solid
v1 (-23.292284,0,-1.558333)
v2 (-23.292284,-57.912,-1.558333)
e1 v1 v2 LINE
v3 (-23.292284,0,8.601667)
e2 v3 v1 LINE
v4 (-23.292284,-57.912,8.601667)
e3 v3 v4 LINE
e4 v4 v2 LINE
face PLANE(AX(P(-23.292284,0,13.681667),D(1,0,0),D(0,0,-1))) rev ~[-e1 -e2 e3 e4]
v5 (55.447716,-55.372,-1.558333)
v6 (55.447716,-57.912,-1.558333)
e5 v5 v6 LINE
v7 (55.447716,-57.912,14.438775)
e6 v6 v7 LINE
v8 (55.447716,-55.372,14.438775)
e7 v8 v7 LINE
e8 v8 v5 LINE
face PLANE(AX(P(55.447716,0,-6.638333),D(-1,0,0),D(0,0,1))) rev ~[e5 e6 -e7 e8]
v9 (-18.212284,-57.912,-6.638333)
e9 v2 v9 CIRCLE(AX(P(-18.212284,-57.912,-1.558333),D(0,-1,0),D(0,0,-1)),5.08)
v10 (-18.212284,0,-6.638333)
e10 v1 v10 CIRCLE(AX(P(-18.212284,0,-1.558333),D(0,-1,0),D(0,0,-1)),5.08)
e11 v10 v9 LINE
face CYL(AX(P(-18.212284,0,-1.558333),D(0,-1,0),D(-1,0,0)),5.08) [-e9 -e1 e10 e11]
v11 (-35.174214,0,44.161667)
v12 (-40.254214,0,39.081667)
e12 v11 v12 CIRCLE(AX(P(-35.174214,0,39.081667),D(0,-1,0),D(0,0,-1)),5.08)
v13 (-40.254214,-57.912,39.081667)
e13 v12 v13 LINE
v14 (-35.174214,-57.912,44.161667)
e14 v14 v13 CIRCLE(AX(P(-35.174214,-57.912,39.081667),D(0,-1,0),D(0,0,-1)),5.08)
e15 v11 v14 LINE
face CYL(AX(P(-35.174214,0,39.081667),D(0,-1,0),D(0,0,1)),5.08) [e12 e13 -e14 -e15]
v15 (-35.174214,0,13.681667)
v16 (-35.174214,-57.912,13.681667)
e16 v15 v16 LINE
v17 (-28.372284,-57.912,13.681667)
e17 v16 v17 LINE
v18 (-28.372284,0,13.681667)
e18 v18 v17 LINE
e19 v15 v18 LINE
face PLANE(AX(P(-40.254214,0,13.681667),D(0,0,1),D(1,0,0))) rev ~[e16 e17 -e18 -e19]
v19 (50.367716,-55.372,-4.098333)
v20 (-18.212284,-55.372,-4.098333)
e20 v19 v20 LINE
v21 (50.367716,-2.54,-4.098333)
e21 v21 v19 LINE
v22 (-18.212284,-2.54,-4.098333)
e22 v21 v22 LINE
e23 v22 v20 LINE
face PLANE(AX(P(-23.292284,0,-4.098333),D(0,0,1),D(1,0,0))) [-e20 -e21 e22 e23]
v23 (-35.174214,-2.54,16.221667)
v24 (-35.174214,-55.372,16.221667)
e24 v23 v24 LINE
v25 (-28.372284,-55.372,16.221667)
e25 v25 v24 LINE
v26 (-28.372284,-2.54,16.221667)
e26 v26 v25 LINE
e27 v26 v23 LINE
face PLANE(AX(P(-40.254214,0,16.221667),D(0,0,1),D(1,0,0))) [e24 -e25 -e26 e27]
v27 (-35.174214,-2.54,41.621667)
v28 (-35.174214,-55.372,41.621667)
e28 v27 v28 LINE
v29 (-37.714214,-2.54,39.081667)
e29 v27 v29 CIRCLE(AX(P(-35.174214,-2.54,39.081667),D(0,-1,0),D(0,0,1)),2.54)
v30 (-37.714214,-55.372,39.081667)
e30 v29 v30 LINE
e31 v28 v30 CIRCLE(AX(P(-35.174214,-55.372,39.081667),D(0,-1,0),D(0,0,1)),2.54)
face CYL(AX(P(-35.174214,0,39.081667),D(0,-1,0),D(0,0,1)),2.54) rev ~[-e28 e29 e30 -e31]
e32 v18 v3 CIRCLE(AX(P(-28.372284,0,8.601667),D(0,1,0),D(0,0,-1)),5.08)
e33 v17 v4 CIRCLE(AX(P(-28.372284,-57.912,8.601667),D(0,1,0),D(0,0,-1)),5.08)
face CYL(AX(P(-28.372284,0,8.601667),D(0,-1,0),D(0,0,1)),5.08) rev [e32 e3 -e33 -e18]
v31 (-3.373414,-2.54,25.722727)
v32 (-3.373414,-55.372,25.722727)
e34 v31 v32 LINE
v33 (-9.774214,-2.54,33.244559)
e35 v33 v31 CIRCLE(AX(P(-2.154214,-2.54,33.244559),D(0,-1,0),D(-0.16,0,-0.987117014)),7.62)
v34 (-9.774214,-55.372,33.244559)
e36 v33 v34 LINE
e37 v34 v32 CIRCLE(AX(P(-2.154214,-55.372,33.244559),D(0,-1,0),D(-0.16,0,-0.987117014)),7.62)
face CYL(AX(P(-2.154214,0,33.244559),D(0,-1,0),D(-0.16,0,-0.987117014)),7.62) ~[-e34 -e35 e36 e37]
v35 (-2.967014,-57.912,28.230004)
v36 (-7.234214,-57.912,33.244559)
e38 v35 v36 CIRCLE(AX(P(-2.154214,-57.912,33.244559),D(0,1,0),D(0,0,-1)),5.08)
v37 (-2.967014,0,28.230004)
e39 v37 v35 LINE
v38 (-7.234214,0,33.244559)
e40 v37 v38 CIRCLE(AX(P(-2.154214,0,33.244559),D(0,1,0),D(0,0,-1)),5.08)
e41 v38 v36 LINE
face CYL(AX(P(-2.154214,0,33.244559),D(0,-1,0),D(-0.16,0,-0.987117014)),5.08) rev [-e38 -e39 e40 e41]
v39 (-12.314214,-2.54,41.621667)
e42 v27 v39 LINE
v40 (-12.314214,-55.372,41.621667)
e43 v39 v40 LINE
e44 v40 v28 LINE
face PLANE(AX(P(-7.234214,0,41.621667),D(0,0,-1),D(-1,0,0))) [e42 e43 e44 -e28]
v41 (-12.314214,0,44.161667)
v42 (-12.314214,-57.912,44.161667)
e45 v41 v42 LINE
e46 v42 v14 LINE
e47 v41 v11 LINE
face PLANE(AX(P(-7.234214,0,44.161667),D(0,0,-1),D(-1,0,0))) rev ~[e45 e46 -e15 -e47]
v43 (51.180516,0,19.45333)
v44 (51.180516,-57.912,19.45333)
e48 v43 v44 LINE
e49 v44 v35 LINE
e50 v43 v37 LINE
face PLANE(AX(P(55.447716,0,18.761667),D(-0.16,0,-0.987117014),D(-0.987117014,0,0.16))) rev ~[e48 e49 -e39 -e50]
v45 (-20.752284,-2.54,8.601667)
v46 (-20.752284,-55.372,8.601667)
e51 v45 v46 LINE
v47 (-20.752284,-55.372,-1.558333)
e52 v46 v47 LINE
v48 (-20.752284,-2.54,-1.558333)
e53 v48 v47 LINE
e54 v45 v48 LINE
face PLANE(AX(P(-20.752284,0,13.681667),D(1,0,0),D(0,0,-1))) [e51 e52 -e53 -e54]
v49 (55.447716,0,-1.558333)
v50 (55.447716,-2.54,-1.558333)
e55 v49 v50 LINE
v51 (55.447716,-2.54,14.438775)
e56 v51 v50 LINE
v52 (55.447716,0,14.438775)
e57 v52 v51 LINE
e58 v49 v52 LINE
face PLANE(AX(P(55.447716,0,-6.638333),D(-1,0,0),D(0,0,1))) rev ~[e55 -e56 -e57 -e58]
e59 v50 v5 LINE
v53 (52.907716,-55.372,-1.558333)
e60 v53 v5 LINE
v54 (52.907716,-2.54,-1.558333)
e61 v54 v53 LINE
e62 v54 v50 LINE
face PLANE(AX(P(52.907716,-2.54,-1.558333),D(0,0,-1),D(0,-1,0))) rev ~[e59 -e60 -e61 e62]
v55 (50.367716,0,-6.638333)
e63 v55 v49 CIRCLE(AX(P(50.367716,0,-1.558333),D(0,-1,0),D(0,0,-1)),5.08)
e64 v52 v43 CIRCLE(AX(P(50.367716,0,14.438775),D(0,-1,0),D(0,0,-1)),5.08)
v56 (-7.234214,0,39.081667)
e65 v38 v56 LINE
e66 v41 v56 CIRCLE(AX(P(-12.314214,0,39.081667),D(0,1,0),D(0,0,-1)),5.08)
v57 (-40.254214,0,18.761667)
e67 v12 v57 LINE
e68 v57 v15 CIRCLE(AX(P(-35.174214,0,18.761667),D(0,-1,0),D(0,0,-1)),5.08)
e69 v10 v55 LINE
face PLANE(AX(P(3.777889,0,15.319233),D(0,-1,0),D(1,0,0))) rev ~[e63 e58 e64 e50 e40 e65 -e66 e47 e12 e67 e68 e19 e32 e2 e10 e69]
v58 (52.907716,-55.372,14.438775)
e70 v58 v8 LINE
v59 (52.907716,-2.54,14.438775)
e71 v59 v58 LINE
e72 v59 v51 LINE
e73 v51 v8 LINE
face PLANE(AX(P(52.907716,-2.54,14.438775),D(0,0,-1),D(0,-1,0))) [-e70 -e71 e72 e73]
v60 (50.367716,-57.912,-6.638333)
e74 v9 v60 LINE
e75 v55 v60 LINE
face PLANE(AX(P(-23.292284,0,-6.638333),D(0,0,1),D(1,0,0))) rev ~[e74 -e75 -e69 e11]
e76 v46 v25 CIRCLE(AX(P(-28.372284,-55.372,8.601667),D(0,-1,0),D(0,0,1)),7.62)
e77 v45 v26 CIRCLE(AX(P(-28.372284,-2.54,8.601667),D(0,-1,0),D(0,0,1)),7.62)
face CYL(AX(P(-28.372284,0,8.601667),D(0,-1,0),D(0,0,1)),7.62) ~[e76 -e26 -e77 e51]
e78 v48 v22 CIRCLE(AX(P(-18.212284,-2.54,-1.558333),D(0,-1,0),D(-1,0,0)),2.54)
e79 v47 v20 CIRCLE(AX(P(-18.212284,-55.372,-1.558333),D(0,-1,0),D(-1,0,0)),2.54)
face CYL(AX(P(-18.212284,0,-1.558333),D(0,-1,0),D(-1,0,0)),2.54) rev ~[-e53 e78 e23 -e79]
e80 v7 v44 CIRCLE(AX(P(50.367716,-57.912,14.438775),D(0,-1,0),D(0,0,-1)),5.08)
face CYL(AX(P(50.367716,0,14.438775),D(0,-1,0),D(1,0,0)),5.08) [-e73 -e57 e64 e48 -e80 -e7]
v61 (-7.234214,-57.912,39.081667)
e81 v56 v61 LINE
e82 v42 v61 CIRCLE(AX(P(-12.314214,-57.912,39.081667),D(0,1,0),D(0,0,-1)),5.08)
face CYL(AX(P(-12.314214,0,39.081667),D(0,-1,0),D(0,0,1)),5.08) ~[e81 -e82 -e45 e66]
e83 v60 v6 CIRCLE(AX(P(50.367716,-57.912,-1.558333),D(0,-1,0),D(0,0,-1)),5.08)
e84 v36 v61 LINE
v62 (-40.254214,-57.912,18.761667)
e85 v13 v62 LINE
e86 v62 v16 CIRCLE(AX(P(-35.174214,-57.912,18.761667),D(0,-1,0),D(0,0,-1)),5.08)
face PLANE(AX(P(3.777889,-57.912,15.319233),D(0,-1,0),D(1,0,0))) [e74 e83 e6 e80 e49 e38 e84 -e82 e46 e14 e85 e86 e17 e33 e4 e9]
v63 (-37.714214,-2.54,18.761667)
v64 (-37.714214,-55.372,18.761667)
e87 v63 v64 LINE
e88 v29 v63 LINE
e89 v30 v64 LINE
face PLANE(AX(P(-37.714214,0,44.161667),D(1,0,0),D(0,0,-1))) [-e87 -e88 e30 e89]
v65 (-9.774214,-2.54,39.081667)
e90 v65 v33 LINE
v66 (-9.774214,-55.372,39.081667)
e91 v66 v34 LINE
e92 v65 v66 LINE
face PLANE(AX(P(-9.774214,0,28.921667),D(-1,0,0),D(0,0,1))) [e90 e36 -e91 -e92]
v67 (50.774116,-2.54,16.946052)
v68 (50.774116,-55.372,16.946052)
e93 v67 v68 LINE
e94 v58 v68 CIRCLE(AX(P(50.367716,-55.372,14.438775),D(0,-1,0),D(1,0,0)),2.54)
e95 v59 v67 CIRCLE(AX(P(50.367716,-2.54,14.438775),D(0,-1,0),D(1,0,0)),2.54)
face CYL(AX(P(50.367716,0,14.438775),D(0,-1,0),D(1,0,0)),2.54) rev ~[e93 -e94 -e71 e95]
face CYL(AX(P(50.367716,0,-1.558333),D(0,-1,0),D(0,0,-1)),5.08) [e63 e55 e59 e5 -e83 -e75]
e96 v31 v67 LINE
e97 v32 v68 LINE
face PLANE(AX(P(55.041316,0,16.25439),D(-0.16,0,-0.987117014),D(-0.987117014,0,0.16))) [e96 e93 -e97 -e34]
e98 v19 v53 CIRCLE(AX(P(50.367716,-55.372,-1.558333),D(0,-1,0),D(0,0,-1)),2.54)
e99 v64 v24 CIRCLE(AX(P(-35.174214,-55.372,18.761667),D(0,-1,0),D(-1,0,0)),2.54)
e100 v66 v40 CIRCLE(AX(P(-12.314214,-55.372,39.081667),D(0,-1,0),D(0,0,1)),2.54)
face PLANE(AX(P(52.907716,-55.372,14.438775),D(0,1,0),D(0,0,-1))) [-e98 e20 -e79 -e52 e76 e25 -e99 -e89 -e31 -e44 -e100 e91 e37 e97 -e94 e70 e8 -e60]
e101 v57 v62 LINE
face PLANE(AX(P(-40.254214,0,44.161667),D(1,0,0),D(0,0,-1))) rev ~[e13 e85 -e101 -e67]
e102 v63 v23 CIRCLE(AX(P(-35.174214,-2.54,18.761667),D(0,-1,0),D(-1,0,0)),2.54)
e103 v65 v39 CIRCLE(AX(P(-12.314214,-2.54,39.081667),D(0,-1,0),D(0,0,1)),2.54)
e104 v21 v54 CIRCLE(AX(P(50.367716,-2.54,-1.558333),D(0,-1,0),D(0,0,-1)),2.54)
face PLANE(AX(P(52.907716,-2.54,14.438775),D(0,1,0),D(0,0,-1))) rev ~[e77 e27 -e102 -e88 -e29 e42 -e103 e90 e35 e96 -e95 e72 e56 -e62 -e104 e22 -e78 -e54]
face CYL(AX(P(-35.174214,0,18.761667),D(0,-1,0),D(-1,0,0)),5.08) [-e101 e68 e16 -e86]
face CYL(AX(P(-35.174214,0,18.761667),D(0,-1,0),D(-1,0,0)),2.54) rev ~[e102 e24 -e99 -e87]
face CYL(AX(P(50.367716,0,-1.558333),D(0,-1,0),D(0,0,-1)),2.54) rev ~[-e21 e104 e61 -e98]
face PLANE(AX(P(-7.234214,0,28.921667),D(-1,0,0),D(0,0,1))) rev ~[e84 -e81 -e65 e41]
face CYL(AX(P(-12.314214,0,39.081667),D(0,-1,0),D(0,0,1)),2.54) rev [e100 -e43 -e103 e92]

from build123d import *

# Parameters (mm, degrees)
F1_DEPTH = 57.912
F2_R     = 5.08
F3_T     = -2.54


# Not quite as in the source:
# - a shell that OpenCascade refuses in one call is made with other operations: the cavity is built on its own and cut out


with BuildPart() as f1:
    # F0 (on Front) → F1 (new body)
    with BuildSketch(Plane.XZ):
        Polygon((-7.2342143664, 44.1616670006), (-40.2542143664, 44.1616670006), (-40.2542143664, 13.6816670006), (-23.2922839558, 13.6816670006), (-23.2922839558, -6.6383329994), (55.4477160442, -6.6383329994), (55.4477160442, 18.7616670006), (-7.2342143664, 28.9216670006), align=None)
    extrude(amount=F1_DEPTH)

    # F2
    f2_edges = [f1.edges().sort_by_distance(p)[0] for p in [
        (-7.234214, -28.956, 44.161667),
        (-7.234214, -28.956, 28.921667),
        (55.447716, -28.956, 18.761667),
        (55.447716, -28.956, -6.638333),
        (-40.254214, -28.956, 44.161667),
        (-40.254214, -28.956, 13.681667),
        (-23.292284, -28.956, 13.681667),
        (-23.292284, -28.956, -6.638333),
    ]]
    fillet(f2_edges, radius=F2_R)

    # F3: a shell. OpenCascade refuses it in one call, so the cavity is built on its own and cut out:
    # the body offset inwards by the wall thickness, plus a prism from it out through each open face.
    f3_core = offset(f1.part, amount=F3_T, mode=Mode.PRIVATE)
    f3_exits = [f3_core.faces().sort_by_distance(p)[0] for p in [
        (52.907716, -28.956, 6.440221),
    ]]
    add(f3_core, mode=Mode.SUBTRACT)
    extrude(f3_exits, amount=-F3_T, mode=Mode.SUBTRACT)


solid = f1.part
